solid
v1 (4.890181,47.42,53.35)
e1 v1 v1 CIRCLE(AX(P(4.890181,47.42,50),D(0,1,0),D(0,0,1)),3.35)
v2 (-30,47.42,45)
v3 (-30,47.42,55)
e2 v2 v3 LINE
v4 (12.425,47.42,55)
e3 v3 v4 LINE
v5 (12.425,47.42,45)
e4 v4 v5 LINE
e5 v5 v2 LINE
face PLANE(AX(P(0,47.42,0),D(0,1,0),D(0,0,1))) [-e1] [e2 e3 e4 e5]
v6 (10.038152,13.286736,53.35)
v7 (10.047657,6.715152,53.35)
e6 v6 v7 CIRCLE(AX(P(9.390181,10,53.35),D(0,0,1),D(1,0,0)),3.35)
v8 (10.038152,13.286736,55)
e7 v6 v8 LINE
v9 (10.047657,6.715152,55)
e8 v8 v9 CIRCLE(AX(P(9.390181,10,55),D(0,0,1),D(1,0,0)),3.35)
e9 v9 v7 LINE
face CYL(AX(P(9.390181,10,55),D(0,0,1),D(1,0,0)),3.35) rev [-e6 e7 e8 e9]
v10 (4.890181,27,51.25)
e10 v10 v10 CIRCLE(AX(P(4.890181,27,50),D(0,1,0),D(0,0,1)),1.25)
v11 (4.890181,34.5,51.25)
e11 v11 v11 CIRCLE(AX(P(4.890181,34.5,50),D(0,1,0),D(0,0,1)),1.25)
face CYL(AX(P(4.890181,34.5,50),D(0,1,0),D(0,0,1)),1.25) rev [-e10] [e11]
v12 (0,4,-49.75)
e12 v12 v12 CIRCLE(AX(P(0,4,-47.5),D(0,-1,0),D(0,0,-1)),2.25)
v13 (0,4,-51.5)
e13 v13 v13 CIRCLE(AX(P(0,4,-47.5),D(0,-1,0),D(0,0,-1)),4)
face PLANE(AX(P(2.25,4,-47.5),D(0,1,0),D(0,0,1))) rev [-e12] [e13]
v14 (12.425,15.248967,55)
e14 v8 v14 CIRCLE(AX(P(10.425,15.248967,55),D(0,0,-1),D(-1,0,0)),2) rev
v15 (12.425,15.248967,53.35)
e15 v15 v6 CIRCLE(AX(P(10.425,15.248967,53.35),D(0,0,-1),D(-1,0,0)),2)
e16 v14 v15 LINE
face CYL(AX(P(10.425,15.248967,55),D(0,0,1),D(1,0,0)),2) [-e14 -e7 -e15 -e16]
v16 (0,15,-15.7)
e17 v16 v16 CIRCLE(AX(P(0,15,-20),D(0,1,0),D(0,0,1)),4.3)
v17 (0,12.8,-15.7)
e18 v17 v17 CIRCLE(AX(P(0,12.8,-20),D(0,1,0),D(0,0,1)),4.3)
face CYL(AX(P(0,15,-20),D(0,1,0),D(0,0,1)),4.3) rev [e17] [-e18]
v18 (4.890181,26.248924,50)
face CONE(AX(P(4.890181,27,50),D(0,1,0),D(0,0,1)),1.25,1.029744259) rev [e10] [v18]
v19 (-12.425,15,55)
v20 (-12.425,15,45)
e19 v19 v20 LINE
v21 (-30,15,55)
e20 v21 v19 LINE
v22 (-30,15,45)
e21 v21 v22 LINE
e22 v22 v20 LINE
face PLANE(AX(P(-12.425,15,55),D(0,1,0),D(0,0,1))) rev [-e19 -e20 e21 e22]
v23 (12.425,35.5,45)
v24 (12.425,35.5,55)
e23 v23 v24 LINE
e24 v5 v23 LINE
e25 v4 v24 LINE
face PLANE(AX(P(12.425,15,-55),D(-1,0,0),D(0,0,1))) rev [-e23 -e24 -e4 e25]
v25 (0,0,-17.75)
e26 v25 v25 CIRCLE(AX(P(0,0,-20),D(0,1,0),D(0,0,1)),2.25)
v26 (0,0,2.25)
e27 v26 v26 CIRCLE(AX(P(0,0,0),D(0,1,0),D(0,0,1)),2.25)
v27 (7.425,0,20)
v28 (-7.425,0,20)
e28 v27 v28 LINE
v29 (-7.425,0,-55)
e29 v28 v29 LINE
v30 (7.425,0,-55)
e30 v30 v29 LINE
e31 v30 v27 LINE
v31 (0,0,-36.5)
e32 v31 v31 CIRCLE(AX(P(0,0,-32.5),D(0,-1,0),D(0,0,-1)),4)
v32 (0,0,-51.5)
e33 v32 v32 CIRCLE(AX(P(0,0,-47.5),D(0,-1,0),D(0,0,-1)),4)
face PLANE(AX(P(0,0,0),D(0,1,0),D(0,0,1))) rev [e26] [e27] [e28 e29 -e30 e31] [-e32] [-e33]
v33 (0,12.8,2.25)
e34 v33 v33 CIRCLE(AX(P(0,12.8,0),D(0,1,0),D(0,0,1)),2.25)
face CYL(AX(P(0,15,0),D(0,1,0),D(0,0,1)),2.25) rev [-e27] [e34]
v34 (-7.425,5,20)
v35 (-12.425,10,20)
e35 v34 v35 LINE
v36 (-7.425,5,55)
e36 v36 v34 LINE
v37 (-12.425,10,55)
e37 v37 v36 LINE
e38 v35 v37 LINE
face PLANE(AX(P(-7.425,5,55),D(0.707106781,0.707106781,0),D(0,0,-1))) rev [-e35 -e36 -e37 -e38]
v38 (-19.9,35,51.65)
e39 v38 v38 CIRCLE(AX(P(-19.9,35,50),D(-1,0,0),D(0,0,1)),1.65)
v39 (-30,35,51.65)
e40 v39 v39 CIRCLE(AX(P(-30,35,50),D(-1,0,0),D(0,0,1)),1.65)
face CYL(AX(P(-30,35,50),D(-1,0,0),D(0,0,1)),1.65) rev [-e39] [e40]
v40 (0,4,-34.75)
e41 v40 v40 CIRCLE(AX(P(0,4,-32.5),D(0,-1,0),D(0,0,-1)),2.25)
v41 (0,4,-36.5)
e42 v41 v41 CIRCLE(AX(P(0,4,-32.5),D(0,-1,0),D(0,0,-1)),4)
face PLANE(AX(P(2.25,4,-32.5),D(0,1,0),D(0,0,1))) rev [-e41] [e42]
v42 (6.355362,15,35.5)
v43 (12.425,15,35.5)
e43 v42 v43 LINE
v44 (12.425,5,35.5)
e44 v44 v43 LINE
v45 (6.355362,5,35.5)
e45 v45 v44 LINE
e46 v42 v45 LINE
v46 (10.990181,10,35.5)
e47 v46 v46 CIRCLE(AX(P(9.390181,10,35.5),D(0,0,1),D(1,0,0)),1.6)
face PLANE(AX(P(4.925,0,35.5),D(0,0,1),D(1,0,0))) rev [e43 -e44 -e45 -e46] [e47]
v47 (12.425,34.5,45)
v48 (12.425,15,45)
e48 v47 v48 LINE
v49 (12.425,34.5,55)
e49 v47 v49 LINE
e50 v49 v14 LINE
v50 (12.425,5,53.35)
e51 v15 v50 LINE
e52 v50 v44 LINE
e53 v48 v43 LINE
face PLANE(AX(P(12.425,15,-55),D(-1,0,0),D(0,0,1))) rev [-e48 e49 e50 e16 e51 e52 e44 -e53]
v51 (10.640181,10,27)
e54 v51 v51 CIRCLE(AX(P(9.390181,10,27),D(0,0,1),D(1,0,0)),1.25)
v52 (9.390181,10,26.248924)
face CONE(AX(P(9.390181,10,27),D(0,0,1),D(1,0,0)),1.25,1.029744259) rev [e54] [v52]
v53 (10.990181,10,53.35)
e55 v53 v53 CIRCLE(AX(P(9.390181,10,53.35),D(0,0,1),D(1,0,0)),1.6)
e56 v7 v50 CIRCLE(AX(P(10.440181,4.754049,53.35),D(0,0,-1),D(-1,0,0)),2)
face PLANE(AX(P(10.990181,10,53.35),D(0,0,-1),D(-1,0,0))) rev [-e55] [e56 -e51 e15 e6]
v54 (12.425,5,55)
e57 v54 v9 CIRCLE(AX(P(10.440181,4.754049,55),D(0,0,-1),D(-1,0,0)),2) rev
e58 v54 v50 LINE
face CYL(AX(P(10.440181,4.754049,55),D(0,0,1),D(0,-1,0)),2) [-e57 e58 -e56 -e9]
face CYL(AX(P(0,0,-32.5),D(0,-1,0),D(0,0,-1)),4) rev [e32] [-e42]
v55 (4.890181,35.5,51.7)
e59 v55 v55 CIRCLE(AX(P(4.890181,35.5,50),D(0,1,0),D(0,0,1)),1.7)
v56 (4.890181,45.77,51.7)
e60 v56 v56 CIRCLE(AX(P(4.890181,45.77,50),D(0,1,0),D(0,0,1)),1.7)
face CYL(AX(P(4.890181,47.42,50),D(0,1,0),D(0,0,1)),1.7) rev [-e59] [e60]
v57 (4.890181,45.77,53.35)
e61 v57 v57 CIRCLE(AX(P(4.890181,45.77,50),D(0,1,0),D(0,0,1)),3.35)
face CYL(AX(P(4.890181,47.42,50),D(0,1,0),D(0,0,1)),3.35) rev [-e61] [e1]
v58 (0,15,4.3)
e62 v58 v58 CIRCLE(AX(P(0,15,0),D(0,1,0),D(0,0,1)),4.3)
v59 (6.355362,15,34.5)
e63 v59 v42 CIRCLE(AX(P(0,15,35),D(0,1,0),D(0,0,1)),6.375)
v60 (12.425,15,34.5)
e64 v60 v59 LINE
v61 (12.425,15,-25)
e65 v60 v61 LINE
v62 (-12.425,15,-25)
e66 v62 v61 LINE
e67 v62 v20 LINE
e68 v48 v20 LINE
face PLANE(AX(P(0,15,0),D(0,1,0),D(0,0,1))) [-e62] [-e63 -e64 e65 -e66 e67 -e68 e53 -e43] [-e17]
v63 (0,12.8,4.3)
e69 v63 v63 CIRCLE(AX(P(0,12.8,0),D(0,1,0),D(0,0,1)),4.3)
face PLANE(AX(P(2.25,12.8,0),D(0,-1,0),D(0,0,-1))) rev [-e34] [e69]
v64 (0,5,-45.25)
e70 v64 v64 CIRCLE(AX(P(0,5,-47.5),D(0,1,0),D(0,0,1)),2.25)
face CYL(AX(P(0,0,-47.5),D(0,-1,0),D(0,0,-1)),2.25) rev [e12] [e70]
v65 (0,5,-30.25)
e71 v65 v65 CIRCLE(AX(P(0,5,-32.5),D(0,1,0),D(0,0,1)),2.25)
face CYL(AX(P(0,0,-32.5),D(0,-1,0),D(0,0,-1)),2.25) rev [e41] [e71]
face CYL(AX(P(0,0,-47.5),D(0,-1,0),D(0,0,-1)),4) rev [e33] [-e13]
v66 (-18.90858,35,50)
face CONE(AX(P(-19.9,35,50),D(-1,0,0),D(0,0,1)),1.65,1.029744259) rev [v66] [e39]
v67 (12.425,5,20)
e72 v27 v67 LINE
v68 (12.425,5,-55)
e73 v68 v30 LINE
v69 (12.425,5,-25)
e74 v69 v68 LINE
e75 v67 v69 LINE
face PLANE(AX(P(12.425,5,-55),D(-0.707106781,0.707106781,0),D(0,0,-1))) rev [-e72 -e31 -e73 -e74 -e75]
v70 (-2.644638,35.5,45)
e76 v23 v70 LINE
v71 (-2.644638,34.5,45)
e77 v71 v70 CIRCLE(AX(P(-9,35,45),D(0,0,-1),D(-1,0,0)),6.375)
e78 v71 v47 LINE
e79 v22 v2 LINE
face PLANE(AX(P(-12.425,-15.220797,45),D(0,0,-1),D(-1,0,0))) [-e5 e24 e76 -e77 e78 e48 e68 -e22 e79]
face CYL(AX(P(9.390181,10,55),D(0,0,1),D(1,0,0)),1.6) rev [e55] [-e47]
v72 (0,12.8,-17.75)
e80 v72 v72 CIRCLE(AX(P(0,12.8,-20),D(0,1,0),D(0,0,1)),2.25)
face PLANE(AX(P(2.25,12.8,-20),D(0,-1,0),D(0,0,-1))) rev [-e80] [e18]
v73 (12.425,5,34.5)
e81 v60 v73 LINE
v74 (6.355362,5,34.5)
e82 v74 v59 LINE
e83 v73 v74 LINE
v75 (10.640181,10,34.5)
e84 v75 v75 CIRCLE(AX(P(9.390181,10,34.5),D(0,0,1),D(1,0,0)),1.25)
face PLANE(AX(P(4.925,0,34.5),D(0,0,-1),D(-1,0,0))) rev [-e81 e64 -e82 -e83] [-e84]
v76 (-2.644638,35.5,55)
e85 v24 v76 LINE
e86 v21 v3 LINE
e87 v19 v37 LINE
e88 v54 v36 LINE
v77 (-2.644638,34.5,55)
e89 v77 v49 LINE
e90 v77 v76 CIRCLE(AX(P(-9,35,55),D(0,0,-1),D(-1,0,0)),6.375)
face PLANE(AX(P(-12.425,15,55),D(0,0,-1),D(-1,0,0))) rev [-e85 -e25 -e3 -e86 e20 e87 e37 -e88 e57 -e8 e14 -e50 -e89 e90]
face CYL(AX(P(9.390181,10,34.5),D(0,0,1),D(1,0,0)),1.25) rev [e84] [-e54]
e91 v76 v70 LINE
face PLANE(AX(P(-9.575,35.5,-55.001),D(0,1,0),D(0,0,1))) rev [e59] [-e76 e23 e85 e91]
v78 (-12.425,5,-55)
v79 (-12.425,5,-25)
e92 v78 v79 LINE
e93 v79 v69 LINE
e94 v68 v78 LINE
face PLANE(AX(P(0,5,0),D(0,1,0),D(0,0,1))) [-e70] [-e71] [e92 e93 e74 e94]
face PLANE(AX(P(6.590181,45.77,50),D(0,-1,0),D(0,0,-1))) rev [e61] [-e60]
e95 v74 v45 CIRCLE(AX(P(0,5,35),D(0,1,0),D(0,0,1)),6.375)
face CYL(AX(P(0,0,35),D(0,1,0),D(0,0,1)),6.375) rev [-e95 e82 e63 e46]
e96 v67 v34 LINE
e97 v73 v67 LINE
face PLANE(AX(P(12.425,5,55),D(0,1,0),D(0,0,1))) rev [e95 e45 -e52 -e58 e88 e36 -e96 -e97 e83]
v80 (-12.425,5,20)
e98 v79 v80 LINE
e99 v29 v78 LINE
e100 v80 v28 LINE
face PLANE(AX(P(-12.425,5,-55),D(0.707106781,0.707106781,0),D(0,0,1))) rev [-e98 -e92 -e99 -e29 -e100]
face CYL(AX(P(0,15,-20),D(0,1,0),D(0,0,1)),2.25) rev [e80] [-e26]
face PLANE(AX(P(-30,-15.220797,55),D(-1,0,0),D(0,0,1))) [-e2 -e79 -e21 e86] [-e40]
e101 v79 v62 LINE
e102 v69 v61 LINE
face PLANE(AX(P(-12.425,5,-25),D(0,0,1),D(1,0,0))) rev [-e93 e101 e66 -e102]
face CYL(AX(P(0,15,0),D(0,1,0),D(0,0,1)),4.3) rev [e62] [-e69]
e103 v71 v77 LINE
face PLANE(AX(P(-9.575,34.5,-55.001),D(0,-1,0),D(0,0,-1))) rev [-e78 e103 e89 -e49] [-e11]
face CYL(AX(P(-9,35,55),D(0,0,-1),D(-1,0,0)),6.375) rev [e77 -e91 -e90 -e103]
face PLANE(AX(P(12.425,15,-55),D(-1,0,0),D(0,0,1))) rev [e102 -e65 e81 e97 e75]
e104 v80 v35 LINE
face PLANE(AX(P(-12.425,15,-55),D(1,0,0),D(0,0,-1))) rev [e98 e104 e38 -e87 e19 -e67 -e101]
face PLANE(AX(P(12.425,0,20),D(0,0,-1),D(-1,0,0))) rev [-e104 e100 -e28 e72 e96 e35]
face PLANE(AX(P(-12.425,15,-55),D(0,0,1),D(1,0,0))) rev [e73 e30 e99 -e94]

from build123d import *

# Parameters (mm, degrees)
SKETCH1_W                       = 24.85
SKETCH1_H                       = 110
BOSS_EXTRUDE1_DEPTH             = 15
SKETCH2_W                       = 24.85
SKETCH2_H                       = 30
CUT_EXTRUDE1_DEPTH              = 10
SKETCH4_W                       = 35
SKETCH4_H                       = 5
CUT_EXTRUDE3_DEPTH              = 63.189408262
SKETCH5_W                       = 17.575
SKETCH5_H                       = 10
BOSS_EXTRUDE2_DEPTH             = 10
SKETCH6_W                       = 42.425
SKETCH6_H                       = 10
BOSS_EXTRUDE3_DEPTH             = 32.42
CHAMFER2_SIZE                   = 5
SKETCH7_R                       = 6.375
CUT_EXTRUDE4_DEPTH              = 71.541168122
SKETCH8_R                       = 6.375
CUT_EXTRUDE5_DEPTH              = 115.667590888
CBORE_FOR_M4_SHCS1_D            = 4.5
CBORE_FOR_M4_SHCS1_DEPTH        = 10.1
CBORE_FOR_M4_SHCS1_CBORE_D      = 8
CBORE_FOR_M4_SHCS1_CBORE_DEPTH  = 4
CBORE_FOR_M4_SHCS1_TIP          = 1.351936393
M4X0_7_TAPPED_HOLE1_D           = 3.3
SKETCH15_W                      = 17.575
SKETCH15_H                      = 10
CUT_EXTRUDE6_DEPTH              = 115.667590888
CHAMFER6_SIZE                   = 5
SKETCH16_W                      = 15
SKETCH16_H                      = 1
CUT_EXTRUDE7_DEPTH              = 71.541168122
CBORE_FOR_M3_SBHCS1_D           = 3.2
CBORE_FOR_M3_SBHCS1_DEPTH       = 19.5
CBORE_FOR_M3_SBHCS1_CBORE_D     = 6.7
CBORE_FOR_M3_SBHCS1_CBORE_DEPTH = 1.65
M3X0_5_TAPPED_HOLE1_D           = 2.5
M3X0_5_TAPPED_HOLE1_DEPTH       = 7.5
M3X0_5_TAPPED_HOLE1_TIP         = 0.751075774
CUT_EXTRUDE8_REACH              = 125.485
SKETCH24_W                      = 22
SKETCH24_H                      = 1
CBORE_FOR_M3_SBHCS2_D           = 3.4
CBORE_FOR_M3_SBHCS2_DEPTH       = 11.92
CBORE_FOR_M3_SBHCS2_CBORE_D     = 6.7
CBORE_FOR_M3_SBHCS2_CBORE_DEPTH = 1.65
M3X0_5_TAPPED_HOLE2_D           = 2.5
M3X0_5_TAPPED_HOLE2_DEPTH       = 7.5
M3X0_5_TAPPED_HOLE2_TIP         = 0.751075774
M4X0_7_TAPPED_HOLE2_D           = 3.3
M4X0_7_TAPPED_HOLE2_DEPTH       = 10.1
M4X0_7_TAPPED_HOLE2_TIP         = 0.991420021
CBORE_FOR_M4_SBHCS1_D           = 4.5
CBORE_FOR_M4_SBHCS1_CBORE_D     = 8.6
CBORE_FOR_M4_SBHCS1_CBORE_DEPTH = 2.2
FILLET2_R                       = 2


with BuildPart() as part:
    # Sketch1 → Boss-Extrude1 (new body)
    with BuildSketch(Plane(origin=(0, 0, 0), x_dir=(1, 0, 0), z_dir=(0, 1, 0))):
        Rectangle(SKETCH1_W, SKETCH1_H)
    extrude(amount=BOSS_EXTRUDE1_DEPTH)

    # Sketch2 → Cut-Extrude1 (cut)
    with BuildSketch(Plane(origin=(0, 15, 0), x_dir=(1, 0, 0), z_dir=(0, 1, 0))):
        with Locations((0, 40)):
            Rectangle(SKETCH2_W, SKETCH2_H)
    extrude(amount=-CUT_EXTRUDE1_DEPTH, mode=Mode.SUBTRACT)

    # Sketch4 → Cut-Extrude3 (cut, through all)
    with BuildSketch(Plane.ZY.offset(12.425)):
        with Locations((37.5, 2.5)):
            Rectangle(SKETCH4_W, SKETCH4_H)
    extrude(amount=-CUT_EXTRUDE3_DEPTH, mode=Mode.SUBTRACT)

    # Sketch5 → Boss-Extrude2 (add)
    with BuildSketch(Plane(origin=(0, 15, 0), x_dir=(1, 0, 0), z_dir=(0, 1, 0))):
        with Locations((-21.2125, -50)):
            Rectangle(SKETCH5_W, SKETCH5_H)
    extrude(amount=-BOSS_EXTRUDE2_DEPTH)

    # Sketch6 → Boss-Extrude3 (add)
    with BuildSketch(Plane(origin=(0, 15, 0), x_dir=(1, 0, 0), z_dir=(0, 1, 0))):
        with Locations((-8.7875, -50)):
            Rectangle(SKETCH6_W, SKETCH6_H)
    extrude(amount=BOSS_EXTRUDE3_DEPTH)

    # Chamfer2
    chamfer2_edges = [part.edges().sort_by_distance(p)[0] for p in [
        (12.425, 0, -17.5),
        (-12.425, 0, -17.5),
    ]]
    chamfer(chamfer2_edges, length=CHAMFER2_SIZE)

    # Sketch7 → Cut-Extrude4 (cut, through all)
    with BuildSketch(Plane(origin=(0, 15, 0), x_dir=(1, 0, 0), z_dir=(0, 1, 0))):
        with Locations(Location((0, -35, 0), (0, 0, 270))):
            Circle(SKETCH7_R)
    extrude(amount=-CUT_EXTRUDE4_DEPTH, mode=Mode.SUBTRACT)

    # Sketch8 → Cut-Extrude5 (cut, through all)
    with BuildSketch(Plane(origin=(0, 0, 45), x_dir=(-1, 0, 0), z_dir=(0, 0, -1))):
        with Locations((9, 35)):
            Circle(SKETCH8_R)
    extrude(amount=-CUT_EXTRUDE5_DEPTH, mode=Mode.SUBTRACT)

    # CBORE for M4 SHCS1
    with Locations(Plane(origin=(0, 0, 0), x_dir=(-1, 0, 0), z_dir=(0, -1, 0))):
        with Locations((0, 47.5), (0, 32.5)):
            CounterBoreHole(CBORE_FOR_M4_SHCS1_D / 2, CBORE_FOR_M4_SHCS1_CBORE_D / 2, CBORE_FOR_M4_SHCS1_CBORE_DEPTH, depth=CBORE_FOR_M4_SHCS1_DEPTH)
            with Locations((0, 0, -(CBORE_FOR_M4_SHCS1_DEPTH + CBORE_FOR_M4_SHCS1_TIP / 2))):  # 118° drill point
                Cone(0, CBORE_FOR_M4_SHCS1_D / 2, CBORE_FOR_M4_SHCS1_TIP, mode=Mode.SUBTRACT)

    # M4x0.7 Tapped Hole1 (through all)
    with Locations(Plane(origin=(0, 0, 0), x_dir=(-1, 0, 0), z_dir=(0, -1, 0))):
        with Locations((0, 20), (0, 0)):
            Hole(M4X0_7_TAPPED_HOLE1_D / 2)

    # Sketch15 → Cut-Extrude6 (cut, through all)
    with BuildSketch(Plane(origin=(0, 0, 45), x_dir=(-1, 0, 0), z_dir=(0, 0, -1))):
        with Locations((21.2125, 10)):
            Rectangle(SKETCH15_W, SKETCH15_H)
    extrude(amount=-CUT_EXTRUDE6_DEPTH, mode=Mode.SUBTRACT)

    # Chamfer6
    chamfer6_edges = [part.edges().sort_by_distance(p)[0] for p in [
        (-12.425, 5, 37.5),
    ]]
    chamfer(chamfer6_edges, length=CHAMFER6_SIZE)

    # Sketch16 → Cut-Extrude7 (cut, through all)
    with BuildSketch(Plane(origin=(0, 15, 0), x_dir=(1, 0, 0), z_dir=(0, 1, 0))):
        with Locations((12.425, -35)):
            Rectangle(SKETCH16_W, SKETCH16_H)
    extrude(amount=-CUT_EXTRUDE7_DEPTH, mode=Mode.SUBTRACT)

    # CBORE for M3 SBHCS1
    with Locations(Plane(origin=(9.390180955, 10, 55), x_dir=(1, 0, 0), z_dir=(0, 0, 1))):
        with Locations((0, 0)):
            CounterBoreHole(CBORE_FOR_M3_SBHCS1_D / 2, CBORE_FOR_M3_SBHCS1_CBORE_D / 2, CBORE_FOR_M3_SBHCS1_CBORE_DEPTH, depth=CBORE_FOR_M3_SBHCS1_DEPTH)

    # M3x0.5 Tapped Hole1
    with Locations(Plane.XY.offset(34.5)):
        with Locations((9.390180955, 10)):
            Hole(M3X0_5_TAPPED_HOLE1_D / 2, depth=M3X0_5_TAPPED_HOLE1_DEPTH)
            with Locations((0, 0, -(M3X0_5_TAPPED_HOLE1_DEPTH + M3X0_5_TAPPED_HOLE1_TIP / 2))):  # 118° drill point
                Cone(0, M3X0_5_TAPPED_HOLE1_D / 2, M3X0_5_TAPPED_HOLE1_TIP, mode=Mode.SUBTRACT)

    # Sketch24 → Cut-Extrude8 (cut, up to next)
    with BuildSketch(Plane.XY.offset(55), mode=Mode.PRIVATE) as cut_extrude8_sk1:
        with Locations((1.425, 35)):
            Rectangle(SKETCH24_W, SKETCH24_H)
    cut_extrude8_tool1 = extrude(cut_extrude8_sk1.sketch, amount=-CUT_EXTRUDE8_REACH, mode=Mode.PRIVATE) & part.part
    add(cut_extrude8_tool1.solids().sort_by_distance((1.425, 35, 55))[0], mode=Mode.SUBTRACT)

    # CBORE for M3 SBHCS2
    with Locations(Plane(origin=(0, 47.42, 0), x_dir=(1, 0, 0), z_dir=(0, 1, 0))):
        with Locations((4.890180955, -50)):
            CounterBoreHole(CBORE_FOR_M3_SBHCS2_D / 2, CBORE_FOR_M3_SBHCS2_CBORE_D / 2, CBORE_FOR_M3_SBHCS2_CBORE_DEPTH, depth=CBORE_FOR_M3_SBHCS2_DEPTH)

    # M3x0.5 Tapped Hole2
    with Locations(Plane(origin=(0, 34.5, 0), x_dir=(1, 0, 0), z_dir=(0, 1, 0))):
        with Locations((4.890180955, -50)):
            Hole(M3X0_5_TAPPED_HOLE2_D / 2, depth=M3X0_5_TAPPED_HOLE2_DEPTH)
            with Locations((0, 0, -(M3X0_5_TAPPED_HOLE2_DEPTH + M3X0_5_TAPPED_HOLE2_TIP / 2))):  # 118° drill point
                Cone(0, M3X0_5_TAPPED_HOLE2_D / 2, M3X0_5_TAPPED_HOLE2_TIP, mode=Mode.SUBTRACT)

    # M4x0.7 Tapped Hole2
    with Locations(Plane.ZY.offset(30)):
        with Locations((50, 35)):
            Hole(M4X0_7_TAPPED_HOLE2_D / 2, depth=M4X0_7_TAPPED_HOLE2_DEPTH)
            with Locations((0, 0, -(M4X0_7_TAPPED_HOLE2_DEPTH + M4X0_7_TAPPED_HOLE2_TIP / 2))):  # 118° drill point
                Cone(0, M4X0_7_TAPPED_HOLE2_D / 2, M4X0_7_TAPPED_HOLE2_TIP, mode=Mode.SUBTRACT)

    # CBORE for M4 SBHCS1 (through all)
    with Locations(Plane(origin=(0, 15, 0), x_dir=(1, 0, 0), z_dir=(0, 1, 0))):
        with Locations((0, 20), (0, 0)):
            CounterBoreHole(CBORE_FOR_M4_SBHCS1_D / 2, CBORE_FOR_M4_SBHCS1_CBORE_D / 2, CBORE_FOR_M4_SBHCS1_CBORE_DEPTH)

    # Fillet2
    # the kernel refuses this fillet: 2 mm, written as the material it takes off along each edge
    with BuildSketch(Plane(origin=(12.425, 11.418581462, 53.35), x_dir=(0, 1, 0), z_dir=(0, 0, 1))) as fillet2_piece_1:
        with BuildLine():
            CenterArc((3.83038506, 2), FILLET2_R, 168.847320213, 101.152679787)
            Line((1.868154584, 2.386848241), (1.828909975, 2.394585206))
            ThreePointArc((1.828909975, 2.394585206), (1.187961295, 0.994712466), (-0.016938286, 0.036236645))
            Line((-0.016938286, 0.036236645), (0, -0.04))
            Line((0, -0.04), (3.83038506, -0.04))
            Line((3.83038506, -0.04), (3.83038506, 0))
        make_face()
    extrude(amount=11.225962649, mode=Mode.SUBTRACT)
    with BuildSketch(Plane(origin=(12.425, 8.581418538, 53.35), x_dir=(0, -1, 0), z_dir=(0, 0, 1))) as fillet2_piece_2:
        with BuildLine():
            CenterArc((3.827369434, -1.984819427), FILLET2_R, 97.063855439, 94.254577376)
            Line((1.866266295, -2.377342649), (1.827044233, -2.385193113))
            ThreePointArc((1.827044233, -2.385193113), (1.18500762, -0.99094432), (-0.016938286, -0.036236645))
            Line((-0.016938286, -0.036236645), (0, 0.04))
            ThreePointArc((0, 0.04), (1.790709269, 0.04), (3.57649952, 0.039696389))
            Line((3.57649952, 0.039696389), (3.581418538, 0))
        make_face()
    extrude(amount=10.603546345, mode=Mode.SUBTRACT)


solid = part.part
